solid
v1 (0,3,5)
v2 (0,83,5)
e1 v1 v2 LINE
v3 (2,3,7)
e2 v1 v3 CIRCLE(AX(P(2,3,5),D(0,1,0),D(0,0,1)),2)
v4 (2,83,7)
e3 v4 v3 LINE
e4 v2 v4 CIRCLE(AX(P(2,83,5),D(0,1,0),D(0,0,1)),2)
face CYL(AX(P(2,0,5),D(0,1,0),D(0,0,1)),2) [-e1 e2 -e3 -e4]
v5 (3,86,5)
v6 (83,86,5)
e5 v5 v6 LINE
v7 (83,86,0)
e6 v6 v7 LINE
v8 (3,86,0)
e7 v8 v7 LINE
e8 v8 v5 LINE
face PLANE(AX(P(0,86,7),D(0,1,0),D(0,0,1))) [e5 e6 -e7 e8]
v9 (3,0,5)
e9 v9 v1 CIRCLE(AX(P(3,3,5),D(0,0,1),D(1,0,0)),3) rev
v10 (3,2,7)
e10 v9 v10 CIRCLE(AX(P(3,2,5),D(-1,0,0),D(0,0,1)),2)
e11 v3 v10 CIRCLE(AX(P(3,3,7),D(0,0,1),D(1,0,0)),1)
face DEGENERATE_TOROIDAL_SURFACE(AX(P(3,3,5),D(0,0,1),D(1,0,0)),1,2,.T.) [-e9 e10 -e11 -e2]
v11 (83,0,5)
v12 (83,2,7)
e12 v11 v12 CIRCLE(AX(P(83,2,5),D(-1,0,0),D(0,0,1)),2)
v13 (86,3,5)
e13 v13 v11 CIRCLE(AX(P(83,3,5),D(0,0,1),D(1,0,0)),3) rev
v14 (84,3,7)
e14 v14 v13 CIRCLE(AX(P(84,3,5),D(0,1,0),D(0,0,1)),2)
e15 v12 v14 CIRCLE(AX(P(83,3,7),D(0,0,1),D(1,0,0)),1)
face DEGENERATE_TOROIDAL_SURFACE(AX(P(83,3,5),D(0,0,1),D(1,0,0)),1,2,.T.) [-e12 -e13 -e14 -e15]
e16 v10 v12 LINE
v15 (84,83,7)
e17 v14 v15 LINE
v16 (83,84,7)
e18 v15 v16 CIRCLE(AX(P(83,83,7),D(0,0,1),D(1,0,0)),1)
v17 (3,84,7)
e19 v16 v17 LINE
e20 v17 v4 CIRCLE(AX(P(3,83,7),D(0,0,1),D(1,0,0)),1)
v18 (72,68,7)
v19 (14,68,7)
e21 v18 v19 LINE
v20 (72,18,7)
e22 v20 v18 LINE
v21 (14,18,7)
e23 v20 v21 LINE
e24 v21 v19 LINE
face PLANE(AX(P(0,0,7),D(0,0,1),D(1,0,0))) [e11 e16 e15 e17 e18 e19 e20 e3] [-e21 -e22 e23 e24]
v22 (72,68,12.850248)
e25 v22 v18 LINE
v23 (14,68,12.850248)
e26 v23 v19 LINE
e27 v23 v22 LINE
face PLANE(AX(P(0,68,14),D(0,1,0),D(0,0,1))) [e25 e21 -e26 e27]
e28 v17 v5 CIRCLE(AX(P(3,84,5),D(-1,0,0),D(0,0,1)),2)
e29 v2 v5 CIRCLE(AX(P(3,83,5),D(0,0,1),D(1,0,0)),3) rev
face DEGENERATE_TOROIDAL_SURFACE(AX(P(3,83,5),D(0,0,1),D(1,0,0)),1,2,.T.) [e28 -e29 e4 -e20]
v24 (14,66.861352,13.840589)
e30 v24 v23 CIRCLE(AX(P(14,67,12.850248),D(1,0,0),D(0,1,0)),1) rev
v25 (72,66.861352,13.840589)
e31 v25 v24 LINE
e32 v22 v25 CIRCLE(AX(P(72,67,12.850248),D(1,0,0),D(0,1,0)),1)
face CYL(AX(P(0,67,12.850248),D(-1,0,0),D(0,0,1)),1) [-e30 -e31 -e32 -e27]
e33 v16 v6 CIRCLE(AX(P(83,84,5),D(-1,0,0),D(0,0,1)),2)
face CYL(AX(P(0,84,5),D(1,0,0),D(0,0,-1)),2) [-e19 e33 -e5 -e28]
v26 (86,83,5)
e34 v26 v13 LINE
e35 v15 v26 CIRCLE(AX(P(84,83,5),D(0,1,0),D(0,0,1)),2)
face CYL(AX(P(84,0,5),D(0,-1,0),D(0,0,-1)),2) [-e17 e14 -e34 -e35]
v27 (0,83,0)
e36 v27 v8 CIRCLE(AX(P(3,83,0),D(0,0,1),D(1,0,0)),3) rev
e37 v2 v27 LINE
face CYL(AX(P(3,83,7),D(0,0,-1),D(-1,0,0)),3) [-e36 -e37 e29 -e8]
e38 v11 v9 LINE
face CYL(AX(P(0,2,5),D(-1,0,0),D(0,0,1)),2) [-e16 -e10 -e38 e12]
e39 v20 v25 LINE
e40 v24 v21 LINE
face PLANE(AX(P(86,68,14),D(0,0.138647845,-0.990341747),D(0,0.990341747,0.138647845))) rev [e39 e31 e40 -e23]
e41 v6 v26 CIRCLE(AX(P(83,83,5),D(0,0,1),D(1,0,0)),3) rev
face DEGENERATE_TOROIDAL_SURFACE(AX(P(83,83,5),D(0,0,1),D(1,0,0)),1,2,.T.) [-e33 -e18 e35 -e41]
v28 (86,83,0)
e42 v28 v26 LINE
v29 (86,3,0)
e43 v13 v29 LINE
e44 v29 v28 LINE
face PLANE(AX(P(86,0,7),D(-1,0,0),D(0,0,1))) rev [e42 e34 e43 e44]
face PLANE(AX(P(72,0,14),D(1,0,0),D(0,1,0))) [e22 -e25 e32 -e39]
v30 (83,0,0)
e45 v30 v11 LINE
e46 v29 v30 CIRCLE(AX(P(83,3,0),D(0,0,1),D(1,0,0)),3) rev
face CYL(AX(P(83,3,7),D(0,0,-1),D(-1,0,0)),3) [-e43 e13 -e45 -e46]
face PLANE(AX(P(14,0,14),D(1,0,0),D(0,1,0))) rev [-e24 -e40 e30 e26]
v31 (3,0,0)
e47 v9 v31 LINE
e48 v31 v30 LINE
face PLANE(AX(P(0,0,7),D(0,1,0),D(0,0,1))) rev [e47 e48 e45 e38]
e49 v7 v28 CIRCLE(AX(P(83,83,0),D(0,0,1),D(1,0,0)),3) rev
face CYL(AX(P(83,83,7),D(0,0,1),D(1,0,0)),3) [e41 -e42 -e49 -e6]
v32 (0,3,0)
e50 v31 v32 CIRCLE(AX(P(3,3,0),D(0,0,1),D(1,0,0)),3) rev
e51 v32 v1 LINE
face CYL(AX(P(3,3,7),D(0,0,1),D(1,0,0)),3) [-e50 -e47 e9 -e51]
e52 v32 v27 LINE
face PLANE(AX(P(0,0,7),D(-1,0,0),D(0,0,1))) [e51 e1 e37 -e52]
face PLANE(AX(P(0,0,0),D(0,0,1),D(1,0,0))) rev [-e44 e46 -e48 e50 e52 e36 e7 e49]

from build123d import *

# Parameters (mm, degrees)
SKETCH_1_W          = 86
SKETCH_1_H          = 86
SKETCH_1_W_2        = 58
SKETCH_1_H_2        = 50
EXTRUDE_1_DEPTH     = 7
SKETCH_1_5_W        = 58
SKETCH_1_5_H        = 50
EXTRUDE_3_DEPTH     = 14
CUT_EXTRUDE_1_DEPTH = 114.030969208
FILLET_1_R          = 3
FILLET_2_R          = 1
FILLET_3_R          = 2


with BuildPart() as part:
    # 草图1 → 凸台-拉伸1 (new body)
    # profile 1 of 2: a face of its own
    with BuildSketch(Plane.XY):
        with Locations((43, 43)):
            Rectangle(SKETCH_1_W, SKETCH_1_H)
        with Locations((43, 43)):
            Rectangle(SKETCH_1_W_2, SKETCH_1_H_2, mode=Mode.SUBTRACT)
    # profile 2 of 2: a face of its own
    with BuildSketch(Plane.XY):
        with Locations((43, 43)):
            Rectangle(SKETCH_1_W_2, SKETCH_1_H_2)
    extrude(amount=EXTRUDE_1_DEPTH)

    # 草图1<5> → 凸台-拉伸3 (add)
    with BuildSketch(Plane.XY):
        with Locations((43, 43)):
            Rectangle(SKETCH_1_5_W, SKETCH_1_5_H)
    extrude(amount=EXTRUDE_3_DEPTH)

    # 草图2 → 切除-拉伸1 (cut, through all)
    with BuildSketch(Plane.ZY.offset(-14)):
        Polygon((14, 68), (7, 18), (14, 18), align=None)
    extrude(amount=-CUT_EXTRUDE_1_DEPTH, mode=Mode.SUBTRACT)

    # 圆角1
    fillet_1_edges = [part.edges().sort_by_distance(p)[0] for p in [
        (0, 0, 3.5),
        (0, 86, 3.5),
        (86, 86, 3.5),
        (86, 0, 3.5),
    ]]
    fillet(fillet_1_edges, radius=FILLET_1_R)

    # 圆角2
    fillet_2_edges = [part.edges().sort_by_distance(p)[0] for p in [
        (43, 68, 14),
    ]]
    fillet(fillet_2_edges, radius=FILLET_2_R)

    # 圆角3
    # the kernel refuses this fillet: 2 mm, written as the material it takes off along each edge
    with BuildSketch(Plane(origin=(83, 86, 7), x_dir=(0, -1, 0), z_dir=(-1, 0, 0)), Plane(origin=(3, 0, 7), x_dir=(0, 1, 0), z_dir=(1, 0, 0)), Plane(origin=(0, 83, 7), x_dir=(1, 0, 0), z_dir=(0, -1, 0))) as fillet_3_piece_1:
        with BuildLine():
            CenterArc((FILLET_3_R, -FILLET_3_R), FILLET_3_R, 90, 90)
            Line((0, -FILLET_3_R), (0, 0))
            Line((0, 0), (FILLET_3_R, 0))
        make_face()
    extrude(amount=80, mode=Mode.SUBTRACT)
    with BuildSketch(Plane(origin=(86, 18, 7), x_dir=(-1, 0, 0), z_dir=(0, 1, 0))) as fillet_3_piece_2:
        with BuildLine():
            CenterArc((FILLET_3_R, -FILLET_3_R), FILLET_3_R, 90, 90)
            Line((0, -FILLET_3_R), (0, 0))
            Line((0, 0), (FILLET_3_R, 0))
        make_face()
    extrude(amount=65, mode=Mode.SUBTRACT)
    with BuildSketch(Plane(origin=(3, 83, 7), x_dir=(-1, 0, 0), z_dir=(0, -1, 0))) as fillet_3_piece_3:
        with BuildLine():
            CenterArc((3 - FILLET_3_R, FILLET_3_R), FILLET_3_R, 270, 90)
            Line((3, FILLET_3_R), (3, 0))
            Line((3, 0), (3 - FILLET_3_R, 0))
        make_face()
    revolve(axis=Axis((3, 83, 7), (0, 0, -1)), revolution_arc=90, mode=Mode.SUBTRACT)
    with BuildSketch(Plane(origin=(3, 3, 7), x_dir=(0, -1, 0), z_dir=(1, 0, 0))) as fillet_3_piece_4:
        with BuildLine():
            CenterArc((3 - FILLET_3_R, FILLET_3_R), FILLET_3_R, 270, 90)
            Line((3, FILLET_3_R), (3, 0))
            Line((3, 0), (3 - FILLET_3_R, 0))
        make_face()
    revolve(axis=Axis((3, 3, 7), (0, 0, -1)), revolution_arc=90, mode=Mode.SUBTRACT)
    with BuildSketch(Plane(origin=(83, 3, 7), x_dir=(0, -1, 0), z_dir=(-1, 0, 0))) as fillet_3_piece_5:
        with BuildLine():
            CenterArc((3 - FILLET_3_R, -FILLET_3_R), FILLET_3_R, 0, 90)
            Line((3, -FILLET_3_R), (3, 0))
            Line((3, 0), (3 - FILLET_3_R, 0))
        make_face()
    revolve(axis=Axis((83, 3, 7), (0, 0, 1)), revolution_arc=90, mode=Mode.SUBTRACT)
    with BuildSketch(Plane(origin=(83, 83, 7), x_dir=(1, 0, 0), z_dir=(0, -1, 0))) as fillet_3_piece_6:
        with BuildLine():
            CenterArc((3 - FILLET_3_R, -FILLET_3_R), FILLET_3_R, 0, 90)
            Line((3, -FILLET_3_R), (3, 0))
            Line((3, 0), (3 - FILLET_3_R, 0))
        make_face()
    revolve(axis=Axis((83, 83, 7), (0, 0, 1)), revolution_arc=90, mode=Mode.SUBTRACT)
    with BuildSketch(Plane(origin=(86, 3, 7), x_dir=(-1, 0, 0), z_dir=(0, 1, 0))) as fillet_3_piece_7:
        with BuildLine():
            CenterArc((FILLET_3_R, -FILLET_3_R), FILLET_3_R, 90, 90)
            Line((0, -FILLET_3_R), (0, 0))
            Line((0, 0), (FILLET_3_R, 0))
        make_face()
    extrude(amount=15, mode=Mode.SUBTRACT)


solid = part.part
